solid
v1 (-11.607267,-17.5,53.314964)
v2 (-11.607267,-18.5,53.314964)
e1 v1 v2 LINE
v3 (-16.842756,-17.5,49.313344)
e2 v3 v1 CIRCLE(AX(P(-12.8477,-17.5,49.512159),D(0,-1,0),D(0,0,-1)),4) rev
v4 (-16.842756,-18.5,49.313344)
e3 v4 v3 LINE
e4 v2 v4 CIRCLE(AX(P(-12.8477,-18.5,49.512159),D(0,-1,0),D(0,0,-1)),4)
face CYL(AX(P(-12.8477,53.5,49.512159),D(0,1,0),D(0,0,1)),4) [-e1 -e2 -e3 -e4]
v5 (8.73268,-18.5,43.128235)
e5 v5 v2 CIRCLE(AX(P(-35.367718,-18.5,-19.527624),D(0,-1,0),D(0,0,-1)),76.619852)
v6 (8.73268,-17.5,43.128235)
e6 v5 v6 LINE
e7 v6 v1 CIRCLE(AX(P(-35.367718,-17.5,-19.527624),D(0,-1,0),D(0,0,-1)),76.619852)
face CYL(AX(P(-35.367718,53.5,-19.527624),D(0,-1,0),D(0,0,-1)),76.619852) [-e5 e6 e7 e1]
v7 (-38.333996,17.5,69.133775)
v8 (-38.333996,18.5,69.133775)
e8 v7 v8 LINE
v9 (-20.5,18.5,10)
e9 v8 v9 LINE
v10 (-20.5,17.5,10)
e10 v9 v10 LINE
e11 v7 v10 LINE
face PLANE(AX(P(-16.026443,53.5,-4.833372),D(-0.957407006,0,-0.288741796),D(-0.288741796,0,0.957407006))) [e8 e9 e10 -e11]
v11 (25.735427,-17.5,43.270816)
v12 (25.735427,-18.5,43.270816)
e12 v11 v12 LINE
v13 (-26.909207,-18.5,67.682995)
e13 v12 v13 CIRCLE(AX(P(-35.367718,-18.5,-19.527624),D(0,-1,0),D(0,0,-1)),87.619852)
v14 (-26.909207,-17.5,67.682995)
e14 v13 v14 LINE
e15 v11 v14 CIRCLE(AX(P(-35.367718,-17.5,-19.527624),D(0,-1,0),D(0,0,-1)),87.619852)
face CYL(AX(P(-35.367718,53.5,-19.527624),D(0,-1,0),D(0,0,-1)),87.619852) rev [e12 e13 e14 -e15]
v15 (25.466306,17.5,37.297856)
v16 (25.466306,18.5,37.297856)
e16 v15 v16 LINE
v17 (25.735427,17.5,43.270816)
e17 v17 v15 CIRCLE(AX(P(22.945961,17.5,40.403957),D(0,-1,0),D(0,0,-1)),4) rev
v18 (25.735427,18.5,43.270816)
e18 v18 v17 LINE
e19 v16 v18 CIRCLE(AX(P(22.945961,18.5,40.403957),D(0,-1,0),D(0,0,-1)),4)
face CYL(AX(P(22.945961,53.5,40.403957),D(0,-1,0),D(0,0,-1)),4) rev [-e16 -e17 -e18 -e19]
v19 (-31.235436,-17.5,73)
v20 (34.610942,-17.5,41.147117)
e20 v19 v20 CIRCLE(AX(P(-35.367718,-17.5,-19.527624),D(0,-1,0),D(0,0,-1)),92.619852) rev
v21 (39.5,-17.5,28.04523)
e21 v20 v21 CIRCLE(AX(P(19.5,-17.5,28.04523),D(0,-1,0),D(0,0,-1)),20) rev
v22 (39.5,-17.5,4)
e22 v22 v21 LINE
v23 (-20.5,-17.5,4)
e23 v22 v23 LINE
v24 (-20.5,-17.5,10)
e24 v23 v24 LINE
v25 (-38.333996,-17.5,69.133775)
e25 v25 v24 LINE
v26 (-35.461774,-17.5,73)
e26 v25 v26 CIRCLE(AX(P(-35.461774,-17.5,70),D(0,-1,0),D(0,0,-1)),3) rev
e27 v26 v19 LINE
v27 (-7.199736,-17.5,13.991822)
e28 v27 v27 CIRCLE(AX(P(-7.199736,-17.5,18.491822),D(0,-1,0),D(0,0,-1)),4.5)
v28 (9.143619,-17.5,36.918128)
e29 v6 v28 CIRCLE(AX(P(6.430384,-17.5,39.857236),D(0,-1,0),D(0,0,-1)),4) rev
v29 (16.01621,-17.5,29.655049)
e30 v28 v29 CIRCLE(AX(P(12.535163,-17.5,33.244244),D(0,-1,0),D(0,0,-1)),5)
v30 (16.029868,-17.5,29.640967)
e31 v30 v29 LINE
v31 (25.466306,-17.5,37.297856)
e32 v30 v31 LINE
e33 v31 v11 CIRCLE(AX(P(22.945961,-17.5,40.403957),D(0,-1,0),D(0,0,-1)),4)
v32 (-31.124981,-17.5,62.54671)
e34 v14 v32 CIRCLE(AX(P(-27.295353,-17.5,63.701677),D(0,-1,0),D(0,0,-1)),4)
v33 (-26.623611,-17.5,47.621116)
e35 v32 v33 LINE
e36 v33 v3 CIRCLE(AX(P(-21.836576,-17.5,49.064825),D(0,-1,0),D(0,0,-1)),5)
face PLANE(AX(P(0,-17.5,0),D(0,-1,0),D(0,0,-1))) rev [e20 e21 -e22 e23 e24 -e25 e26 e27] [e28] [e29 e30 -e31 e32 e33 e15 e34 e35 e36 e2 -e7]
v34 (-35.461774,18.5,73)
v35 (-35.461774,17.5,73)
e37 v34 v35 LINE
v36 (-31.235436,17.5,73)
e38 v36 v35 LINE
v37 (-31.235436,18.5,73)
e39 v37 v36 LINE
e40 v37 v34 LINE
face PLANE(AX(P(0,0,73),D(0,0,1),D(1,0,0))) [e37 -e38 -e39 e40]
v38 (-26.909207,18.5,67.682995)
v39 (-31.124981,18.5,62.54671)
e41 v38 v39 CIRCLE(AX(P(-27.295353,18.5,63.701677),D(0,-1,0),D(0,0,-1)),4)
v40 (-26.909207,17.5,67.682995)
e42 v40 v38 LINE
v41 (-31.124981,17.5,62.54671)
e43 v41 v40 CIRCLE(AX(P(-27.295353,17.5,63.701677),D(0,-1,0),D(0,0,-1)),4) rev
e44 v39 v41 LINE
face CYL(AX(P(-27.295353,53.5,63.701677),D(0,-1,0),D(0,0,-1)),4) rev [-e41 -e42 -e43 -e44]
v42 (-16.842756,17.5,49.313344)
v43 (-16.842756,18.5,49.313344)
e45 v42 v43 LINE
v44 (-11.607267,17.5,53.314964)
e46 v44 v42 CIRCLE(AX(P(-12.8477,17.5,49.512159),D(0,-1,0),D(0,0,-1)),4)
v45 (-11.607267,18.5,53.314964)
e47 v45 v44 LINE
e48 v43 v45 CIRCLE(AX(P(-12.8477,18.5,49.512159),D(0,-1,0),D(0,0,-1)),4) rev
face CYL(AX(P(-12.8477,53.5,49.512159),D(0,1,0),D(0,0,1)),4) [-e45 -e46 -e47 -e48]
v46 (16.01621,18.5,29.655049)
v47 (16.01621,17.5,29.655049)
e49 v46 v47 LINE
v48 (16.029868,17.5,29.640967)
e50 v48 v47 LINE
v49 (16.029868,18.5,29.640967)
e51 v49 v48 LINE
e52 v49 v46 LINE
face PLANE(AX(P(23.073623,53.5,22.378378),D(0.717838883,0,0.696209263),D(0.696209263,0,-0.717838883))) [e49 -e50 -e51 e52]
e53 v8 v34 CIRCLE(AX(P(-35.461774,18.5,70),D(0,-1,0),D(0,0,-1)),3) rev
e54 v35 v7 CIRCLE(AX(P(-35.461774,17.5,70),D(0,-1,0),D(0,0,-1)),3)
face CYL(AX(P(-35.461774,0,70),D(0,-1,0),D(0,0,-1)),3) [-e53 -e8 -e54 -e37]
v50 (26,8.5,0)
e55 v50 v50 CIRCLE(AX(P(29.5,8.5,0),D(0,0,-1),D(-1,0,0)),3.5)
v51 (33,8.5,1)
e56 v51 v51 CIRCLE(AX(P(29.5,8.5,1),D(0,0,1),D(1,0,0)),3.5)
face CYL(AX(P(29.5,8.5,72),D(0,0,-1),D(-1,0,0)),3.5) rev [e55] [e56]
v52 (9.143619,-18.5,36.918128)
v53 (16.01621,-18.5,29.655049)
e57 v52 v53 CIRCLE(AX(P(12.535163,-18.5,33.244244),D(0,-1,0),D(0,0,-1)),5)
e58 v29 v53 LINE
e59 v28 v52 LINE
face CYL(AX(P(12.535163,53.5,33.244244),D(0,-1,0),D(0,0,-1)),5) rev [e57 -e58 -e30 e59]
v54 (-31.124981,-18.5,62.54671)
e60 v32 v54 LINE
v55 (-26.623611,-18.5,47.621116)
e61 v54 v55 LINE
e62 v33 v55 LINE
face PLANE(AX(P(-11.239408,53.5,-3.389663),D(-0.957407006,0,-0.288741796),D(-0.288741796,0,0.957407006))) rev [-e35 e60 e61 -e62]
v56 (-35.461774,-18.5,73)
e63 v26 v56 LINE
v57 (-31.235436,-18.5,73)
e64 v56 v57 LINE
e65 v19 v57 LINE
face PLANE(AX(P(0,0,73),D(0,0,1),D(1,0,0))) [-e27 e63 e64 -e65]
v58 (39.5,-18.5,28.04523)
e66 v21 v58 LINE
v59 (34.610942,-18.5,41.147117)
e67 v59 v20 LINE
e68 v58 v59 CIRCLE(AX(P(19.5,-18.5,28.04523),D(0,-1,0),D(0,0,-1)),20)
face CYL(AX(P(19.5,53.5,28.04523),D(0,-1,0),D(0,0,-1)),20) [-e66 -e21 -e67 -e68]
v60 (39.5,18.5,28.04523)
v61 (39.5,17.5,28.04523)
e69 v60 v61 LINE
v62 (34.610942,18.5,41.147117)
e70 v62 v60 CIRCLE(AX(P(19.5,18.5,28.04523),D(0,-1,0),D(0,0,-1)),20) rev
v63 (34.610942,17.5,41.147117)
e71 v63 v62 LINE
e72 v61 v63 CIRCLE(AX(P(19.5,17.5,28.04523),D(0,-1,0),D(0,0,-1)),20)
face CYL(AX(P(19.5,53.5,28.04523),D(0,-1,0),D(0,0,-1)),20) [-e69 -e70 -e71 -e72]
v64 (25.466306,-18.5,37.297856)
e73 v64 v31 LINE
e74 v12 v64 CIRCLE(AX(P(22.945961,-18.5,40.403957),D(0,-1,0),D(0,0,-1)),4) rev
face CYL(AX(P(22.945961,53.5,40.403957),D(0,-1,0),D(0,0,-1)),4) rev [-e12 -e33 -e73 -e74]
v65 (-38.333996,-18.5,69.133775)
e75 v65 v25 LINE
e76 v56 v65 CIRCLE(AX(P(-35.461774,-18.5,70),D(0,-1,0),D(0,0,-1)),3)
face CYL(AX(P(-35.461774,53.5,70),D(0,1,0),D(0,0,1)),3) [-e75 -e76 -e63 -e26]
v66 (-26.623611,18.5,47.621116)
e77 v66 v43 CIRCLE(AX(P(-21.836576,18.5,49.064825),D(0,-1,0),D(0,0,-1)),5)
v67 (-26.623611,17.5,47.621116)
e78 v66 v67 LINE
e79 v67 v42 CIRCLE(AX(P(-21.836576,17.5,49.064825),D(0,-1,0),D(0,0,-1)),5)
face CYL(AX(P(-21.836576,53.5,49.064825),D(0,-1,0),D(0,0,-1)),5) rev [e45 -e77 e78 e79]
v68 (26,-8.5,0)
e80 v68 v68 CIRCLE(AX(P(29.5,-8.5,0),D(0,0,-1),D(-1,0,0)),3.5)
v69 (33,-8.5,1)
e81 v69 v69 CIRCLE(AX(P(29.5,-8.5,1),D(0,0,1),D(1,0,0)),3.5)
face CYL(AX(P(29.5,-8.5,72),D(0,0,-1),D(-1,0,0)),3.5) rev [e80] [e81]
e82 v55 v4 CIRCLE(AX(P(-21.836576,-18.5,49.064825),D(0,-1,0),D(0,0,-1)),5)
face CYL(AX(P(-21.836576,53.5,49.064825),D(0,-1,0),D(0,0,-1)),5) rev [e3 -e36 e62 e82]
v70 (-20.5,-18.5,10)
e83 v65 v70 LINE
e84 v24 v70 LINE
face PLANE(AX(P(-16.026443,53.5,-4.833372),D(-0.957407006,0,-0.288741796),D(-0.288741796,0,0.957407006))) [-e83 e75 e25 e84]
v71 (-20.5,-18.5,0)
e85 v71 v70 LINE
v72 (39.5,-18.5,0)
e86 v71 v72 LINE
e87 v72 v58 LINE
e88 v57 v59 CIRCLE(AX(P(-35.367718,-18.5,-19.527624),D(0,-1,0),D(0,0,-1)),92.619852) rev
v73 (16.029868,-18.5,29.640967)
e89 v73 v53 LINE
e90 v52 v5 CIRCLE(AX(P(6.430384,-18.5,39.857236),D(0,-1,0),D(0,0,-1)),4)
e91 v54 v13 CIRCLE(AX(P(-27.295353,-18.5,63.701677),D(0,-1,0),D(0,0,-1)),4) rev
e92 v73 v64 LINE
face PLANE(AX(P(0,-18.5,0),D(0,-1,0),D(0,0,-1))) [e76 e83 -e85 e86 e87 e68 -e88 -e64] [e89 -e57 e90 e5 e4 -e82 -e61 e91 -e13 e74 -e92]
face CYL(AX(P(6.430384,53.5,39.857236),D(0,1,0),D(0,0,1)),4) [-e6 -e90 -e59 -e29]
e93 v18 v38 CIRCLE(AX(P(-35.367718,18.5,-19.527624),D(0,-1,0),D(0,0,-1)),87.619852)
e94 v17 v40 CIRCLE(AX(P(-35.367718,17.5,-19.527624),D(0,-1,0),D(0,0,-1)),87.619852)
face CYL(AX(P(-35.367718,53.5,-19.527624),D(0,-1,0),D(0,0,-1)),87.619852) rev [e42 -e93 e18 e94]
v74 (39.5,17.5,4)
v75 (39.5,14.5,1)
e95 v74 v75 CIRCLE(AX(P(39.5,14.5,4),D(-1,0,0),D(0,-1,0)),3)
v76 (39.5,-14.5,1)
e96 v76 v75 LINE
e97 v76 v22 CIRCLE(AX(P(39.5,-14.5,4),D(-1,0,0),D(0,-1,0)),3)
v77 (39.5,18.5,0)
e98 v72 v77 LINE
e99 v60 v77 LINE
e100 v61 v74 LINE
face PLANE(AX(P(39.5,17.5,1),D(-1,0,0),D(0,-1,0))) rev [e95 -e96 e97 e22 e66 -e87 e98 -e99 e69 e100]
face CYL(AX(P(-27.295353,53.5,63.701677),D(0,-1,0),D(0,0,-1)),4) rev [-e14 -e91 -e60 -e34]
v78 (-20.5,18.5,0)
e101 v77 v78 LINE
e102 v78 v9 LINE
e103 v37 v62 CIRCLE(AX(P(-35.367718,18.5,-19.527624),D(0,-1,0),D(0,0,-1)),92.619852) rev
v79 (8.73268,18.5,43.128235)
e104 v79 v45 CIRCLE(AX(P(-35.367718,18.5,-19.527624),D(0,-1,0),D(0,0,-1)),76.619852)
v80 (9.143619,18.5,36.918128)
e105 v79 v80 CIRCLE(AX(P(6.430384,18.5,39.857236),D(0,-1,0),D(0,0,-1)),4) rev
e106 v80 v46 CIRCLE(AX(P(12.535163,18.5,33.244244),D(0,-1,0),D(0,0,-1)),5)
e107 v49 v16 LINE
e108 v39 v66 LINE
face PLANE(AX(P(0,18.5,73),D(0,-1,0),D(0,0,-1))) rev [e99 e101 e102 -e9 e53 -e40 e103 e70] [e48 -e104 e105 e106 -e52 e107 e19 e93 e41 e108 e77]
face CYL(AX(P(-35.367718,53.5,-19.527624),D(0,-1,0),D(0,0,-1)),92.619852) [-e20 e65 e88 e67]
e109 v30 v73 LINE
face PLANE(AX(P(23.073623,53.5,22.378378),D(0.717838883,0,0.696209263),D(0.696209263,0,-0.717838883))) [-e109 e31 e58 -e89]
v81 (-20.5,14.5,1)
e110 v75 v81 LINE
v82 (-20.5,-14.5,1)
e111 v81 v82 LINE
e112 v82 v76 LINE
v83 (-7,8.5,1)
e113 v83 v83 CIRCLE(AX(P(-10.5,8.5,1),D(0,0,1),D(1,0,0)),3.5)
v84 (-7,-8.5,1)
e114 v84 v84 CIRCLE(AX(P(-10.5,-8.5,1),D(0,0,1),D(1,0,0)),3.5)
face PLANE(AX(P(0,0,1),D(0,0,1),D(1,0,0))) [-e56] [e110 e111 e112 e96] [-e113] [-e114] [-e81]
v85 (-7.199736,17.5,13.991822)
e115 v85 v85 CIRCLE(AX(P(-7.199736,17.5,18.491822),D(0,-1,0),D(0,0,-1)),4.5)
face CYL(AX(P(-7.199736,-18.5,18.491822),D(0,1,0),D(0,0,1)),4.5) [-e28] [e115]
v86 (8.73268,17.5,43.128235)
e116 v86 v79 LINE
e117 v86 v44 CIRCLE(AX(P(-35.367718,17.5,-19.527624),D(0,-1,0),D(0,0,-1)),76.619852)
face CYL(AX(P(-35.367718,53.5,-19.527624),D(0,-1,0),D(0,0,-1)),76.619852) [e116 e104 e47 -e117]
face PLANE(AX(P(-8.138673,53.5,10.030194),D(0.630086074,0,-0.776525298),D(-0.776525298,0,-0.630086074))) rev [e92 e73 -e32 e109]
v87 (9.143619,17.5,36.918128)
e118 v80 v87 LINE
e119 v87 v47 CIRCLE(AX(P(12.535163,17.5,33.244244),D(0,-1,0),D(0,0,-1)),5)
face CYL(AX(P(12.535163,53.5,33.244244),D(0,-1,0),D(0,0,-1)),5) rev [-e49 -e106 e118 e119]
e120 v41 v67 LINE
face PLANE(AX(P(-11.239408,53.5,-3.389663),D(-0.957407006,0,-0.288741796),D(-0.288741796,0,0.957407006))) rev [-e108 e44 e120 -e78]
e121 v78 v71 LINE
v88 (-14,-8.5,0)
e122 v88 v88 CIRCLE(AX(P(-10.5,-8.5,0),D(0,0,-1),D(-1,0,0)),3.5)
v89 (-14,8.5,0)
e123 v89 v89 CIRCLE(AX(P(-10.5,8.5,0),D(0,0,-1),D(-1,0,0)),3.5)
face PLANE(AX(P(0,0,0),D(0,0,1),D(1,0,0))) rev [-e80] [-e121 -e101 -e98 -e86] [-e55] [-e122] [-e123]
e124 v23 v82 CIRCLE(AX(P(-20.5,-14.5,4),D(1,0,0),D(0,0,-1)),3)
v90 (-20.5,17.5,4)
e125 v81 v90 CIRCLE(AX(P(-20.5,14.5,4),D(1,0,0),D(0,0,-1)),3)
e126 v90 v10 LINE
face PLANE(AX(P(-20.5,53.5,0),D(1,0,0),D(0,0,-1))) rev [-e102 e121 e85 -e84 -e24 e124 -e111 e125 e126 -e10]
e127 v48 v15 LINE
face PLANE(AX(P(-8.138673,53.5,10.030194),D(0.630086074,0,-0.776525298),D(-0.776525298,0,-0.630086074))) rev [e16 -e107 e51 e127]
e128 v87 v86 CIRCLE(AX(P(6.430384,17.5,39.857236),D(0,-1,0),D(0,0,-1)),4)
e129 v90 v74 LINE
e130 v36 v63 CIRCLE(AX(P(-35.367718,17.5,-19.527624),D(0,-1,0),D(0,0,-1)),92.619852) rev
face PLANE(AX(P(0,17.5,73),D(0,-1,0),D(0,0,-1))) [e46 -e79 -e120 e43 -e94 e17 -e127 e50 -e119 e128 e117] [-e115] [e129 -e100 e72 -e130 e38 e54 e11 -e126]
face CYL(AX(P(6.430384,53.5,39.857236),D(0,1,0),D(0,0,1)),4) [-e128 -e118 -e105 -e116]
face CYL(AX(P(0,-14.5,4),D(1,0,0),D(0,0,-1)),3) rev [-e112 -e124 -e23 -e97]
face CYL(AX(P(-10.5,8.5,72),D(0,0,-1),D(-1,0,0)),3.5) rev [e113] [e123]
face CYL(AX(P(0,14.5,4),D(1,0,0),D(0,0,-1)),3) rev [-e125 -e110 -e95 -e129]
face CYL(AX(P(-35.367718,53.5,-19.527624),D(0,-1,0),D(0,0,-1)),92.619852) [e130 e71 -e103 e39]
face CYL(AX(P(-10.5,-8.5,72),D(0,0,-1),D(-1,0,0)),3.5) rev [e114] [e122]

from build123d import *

# Parameters (mm, degrees)
CROQUIS1_W                   = 79
CROQUIS1_H                   = 35
SALIENTE_EXTRUIR1_DEPTH      = 1
SALIENTE_EXTRUIR3_DEPTH      = 72
SALIENTE_EXTRUIR3_DEPTH_BACK = 1
CROQUIS2_W                   = 79
CROQUIS2_H                   = 1
CORTAR_EXTRUIR1_DEPTH        = 72
CORTAR_EXTRUIR2_DEPTH        = 72
CORTAR_EXTRUIR3_DEPTH        = 72
REDONDEO4_R                  = 3
REDONDEO5_R                  = 20
REDONDEO6_R                  = 3
CORTAR_EXTRUIR4_DEPTH        = 72
REDONDEO7_START              = -18.5
REDONDEO7_DEPTH              = 1
REDONDEO7_2_DEPTH            = 1
REDONDEO8_R                  = 4
REDONDEO9_R                  = 3
CROQUIS8_R                   = 3.5
CORTAR_EXTRUIR5_DEPTH        = 72
CROQUIS13_R                  = 4.5
SALIENTE_EXTRUIR7_DEPTH      = 37


with BuildPart() as part:
    # Croquis1 → Saliente-Extruir1 (new body)
    with BuildSketch(Plane.XY):
        Rectangle(CROQUIS1_W, CROQUIS1_H)
    extrude(amount=SALIENTE_EXTRUIR1_DEPTH)

    # Croquis2 → Saliente-Extruir3 (add, two sides: drawn at the far end of the back side and taken through both)
    with BuildSketch(Plane.XY.offset(1).offset(-SALIENTE_EXTRUIR3_DEPTH_BACK)):
        with Locations((0, -18)):
            Rectangle(CROQUIS2_W, CROQUIS2_H)
        with Locations((0, 18)):
            Rectangle(CROQUIS2_W, CROQUIS2_H)
    extrude(amount=SALIENTE_EXTRUIR3_DEPTH + SALIENTE_EXTRUIR3_DEPTH_BACK)

    # Croquis3 → Cortar-Extruir1 (cut)
    with BuildSketch(Plane.XZ.offset(18.5)):
        Polygon((-39.5, 1), (-20.5, 1), (-20.5, 10), (-39.5, 73), align=None)
    extrude(amount=-CORTAR_EXTRUIR1_DEPTH, mode=Mode.SUBTRACT)

    # Croquis4 → Cortar-Extruir2 (cut)
    with BuildSketch(Plane.XY.offset(1)):
        Polygon((-20.5, 17.5), (-20.5, 18.5), (-39.5, 18.5), (-39.5, -18.5), (-20.5, -18.5), (-20.5, -17.5), align=None)
    extrude(amount=-CORTAR_EXTRUIR2_DEPTH, mode=Mode.SUBTRACT)

    # Croquis5 → Cortar-Extruir3 (cut)
    with BuildSketch(Plane.XZ.offset(18.5)):
        with BuildLine():
            ThreePointArc((-31.235435529, 73), (8.464348123, 62.063962298), (39.5, 35))
            Line((39.5, 35), (39.5, 73))
            Line((39.5, 73), (-31.235435529, 73))
        make_face()
    extrude(amount=-CORTAR_EXTRUIR3_DEPTH, mode=Mode.SUBTRACT)

    # Redondeo4
    redondeo4_edges = [part.edges().sort_by_distance(p)[0] for p in [
        (-39.5, -18, 73),
    ]]
    fillet(redondeo4_edges, radius=REDONDEO4_R)

    # Redondeo5
    redondeo5_edges = [part.edges().sort_by_distance(p)[0] for p in [
        (39.5, 18, 35),
        (39.5, -18, 35),
    ]]
    fillet(redondeo5_edges, radius=REDONDEO5_R)

    # Redondeo6
    redondeo6_edges = [part.edges().sort_by_distance(p)[0] for p in [
        (-39.5, 18, 73),
    ]]
    fillet(redondeo6_edges, radius=REDONDEO6_R)

    # Croquis6 → Cortar-Extruir4 (cut)
    with BuildSketch(Plane.XZ.offset(18.5)):
        with BuildLine():
            Line((16.016209597, 29.655049393), (16.02986755, 29.640967118))
            Line((16.02986755, 29.640967118), (20.305135111, 33.109993252))
            Line((20.305135111, 33.109993252), (20.307251231, 33.111710308))
            Line((20.307251231, 33.111710308), (28.870480014, 40.060062433))
            ThreePointArc((28.870480014, 40.060062433), (5.697385816, 57.873252637), (-22.045320516, 67.073485531))
            ThreePointArc((-22.045320516, 67.073485531), (-26.684583157, 67.660916613), (-31.348578825, 68))
            Line((-31.348578825, 68), (-32.769624166, 68))
            Line((-32.769624166, 68), (-26.623611491, 47.621115867))
            ThreePointArc((-26.623611491, 47.621115867), (-20.392867483, 44.277789814), (-17.049541429, 50.508533823))
            Line((-17.049541429, 50.508533823), (-18.465863192, 55.204758613))
            ThreePointArc((-18.465863192, 55.204758613), (-1.905942772, 49.399230787), (12.898781807, 39.978230428))
            ThreePointArc((12.898781807, 39.978230428), (12.954271862, 39.933178304), (13.009719865, 39.888074435))
            Line((13.009719865, 39.888074435), (9.803992697, 37.43240656))
            Line((9.803992697, 37.43240656), (9.202695315, 36.971797598))
            ThreePointArc((9.202695315, 36.971797598), (9.127703809, 36.903372112), (9.054116963, 36.833438221))
            ThreePointArc((9.054116963, 36.833438221), (8.795597311, 29.925261077), (15.685593651, 29.361617315))
            ThreePointArc((15.685593651, 29.361617315), (15.85414601, 29.504677838), (16.016209597, 29.655049393))
        make_face()
    extrude(amount=-CORTAR_EXTRUIR4_DEPTH, mode=Mode.SUBTRACT)

    # Redondeo7: read off the stored shape, not the designer's step
    # Redondeo7 outline → Redondeo7 (cut)
    with BuildSketch(Plane(origin=(0, 0, 0), x_dir=(1, 0, 0), z_dir=(0, 1, 0)).offset(REDONDEO7_START)):
        with BuildLine():
            ThreePointArc((9.143619043, -36.918128357), (10.421654669, -40.121349), (8.732679814, -43.12823468))
            ThreePointArc((8.732679814, -43.12823468), (10.899572634, -41.545606896), (13.009719865, -39.888074435))
            Line((13.009719865, -39.888074435), (9.202695315, -36.971797598))
            ThreePointArc((9.202695315, -36.971797598), (9.173050087, -36.945080858), (9.143619043, -36.918128357))
        make_face()
        with BuildLine():
            ThreePointArc((-18.465863192, -55.204758613), (-15.014619907, -54.339507434), (-11.607267341, -53.314964462))
            ThreePointArc((-11.607267341, -53.314964462), (-15.276738996, -52.690173302), (-16.842756461, -49.313344091))
            ThreePointArc((-16.842756461, -49.313344091), (-16.90977213, -49.917232668), (-17.049541429, -50.508533823))
            Line((-17.049541429, -50.508533823), (-18.465863192, -55.204758613))
        make_face()
    extrude(amount=REDONDEO7_DEPTH, mode=Mode.SUBTRACT)

    # Redondeo7 2 outline → Redondeo7 2 (add)
    with BuildSketch(Plane(origin=(0, 0, 0), x_dir=(1, 0, 0), z_dir=(0, 1, 0)).offset(REDONDEO7_START)):
        with BuildLine():
            ThreePointArc((25.466305511, -37.297856291), (26.941907185, -40.223913599), (25.735427009, -43.270816494))
            ThreePointArc((25.735427009, -43.270816494), (27.323511874, -41.685513114), (28.870480014, -40.060062433))
            Line((28.870480014, -40.060062433), (25.466305511, -37.297856291))
        make_face()
        with BuildLine():
            ThreePointArc((-26.909207237, -67.682994851), (-30.387237337, -66.239442173), (-31.124981113, -62.546709875))
            Line((-31.124981113, -62.546709875), (-32.769624166, -68))
            Line((-32.769624166, -68), (-31.348578825, -68))
            ThreePointArc((-31.348578825, -68), (-29.12687991, -67.869689367), (-26.909207237, -67.682994851))
        make_face()
    extrude(amount=REDONDEO7_2_DEPTH)

    # Redondeo8
    redondeo8_edges = [part.edges().sort_by_distance(p)[0] for p in [
        (-18.465863192, 18, 55.204758613),
        (28.870480014, 18, 40.060062433),
        (-32.769624166, 18, 68),
        (13.009719865, 18, 39.888074435),
    ]]
    fillet(redondeo8_edges, radius=REDONDEO8_R)

    # Redondeo9
    redondeo9_edges = [part.edges().sort_by_distance(p)[0] for p in [
        (9.5, -17.5, 1),
        (9.5, 17.5, 1),
    ]]
    fillet(redondeo9_edges, radius=REDONDEO9_R)

    # Croquis8 → Cortar-Extruir5 (cut)
    with BuildSketch(Plane(origin=(0, 0, 0), x_dir=(-1, 0, 0), z_dir=(0, 0, -1))):
        with Locations((10.5, 8.5)):
            Circle(CROQUIS8_R)
        with Locations((-29.5, 8.5)):
            Circle(CROQUIS8_R)
        with Locations((-29.5, -8.5)):
            Circle(CROQUIS8_R)
        with Locations((10.5, -8.5)):
            Circle(CROQUIS8_R)
    extrude(amount=-CORTAR_EXTRUIR5_DEPTH, mode=Mode.SUBTRACT)

    # Croquis13 → Saliente-Extruir7 (add)
    with BuildSketch(Plane(origin=(0, 18.5, 0), x_dir=(1, 0, 0), z_dir=(0, 1, 0))):
        with Locations(Location((-7.199736414, -18.491822177, 0), (0, 0, 90))):
            Circle(CROQUIS13_R)
    extrude(amount=-SALIENTE_EXTRUIR7_DEPTH)


solid = part.part
